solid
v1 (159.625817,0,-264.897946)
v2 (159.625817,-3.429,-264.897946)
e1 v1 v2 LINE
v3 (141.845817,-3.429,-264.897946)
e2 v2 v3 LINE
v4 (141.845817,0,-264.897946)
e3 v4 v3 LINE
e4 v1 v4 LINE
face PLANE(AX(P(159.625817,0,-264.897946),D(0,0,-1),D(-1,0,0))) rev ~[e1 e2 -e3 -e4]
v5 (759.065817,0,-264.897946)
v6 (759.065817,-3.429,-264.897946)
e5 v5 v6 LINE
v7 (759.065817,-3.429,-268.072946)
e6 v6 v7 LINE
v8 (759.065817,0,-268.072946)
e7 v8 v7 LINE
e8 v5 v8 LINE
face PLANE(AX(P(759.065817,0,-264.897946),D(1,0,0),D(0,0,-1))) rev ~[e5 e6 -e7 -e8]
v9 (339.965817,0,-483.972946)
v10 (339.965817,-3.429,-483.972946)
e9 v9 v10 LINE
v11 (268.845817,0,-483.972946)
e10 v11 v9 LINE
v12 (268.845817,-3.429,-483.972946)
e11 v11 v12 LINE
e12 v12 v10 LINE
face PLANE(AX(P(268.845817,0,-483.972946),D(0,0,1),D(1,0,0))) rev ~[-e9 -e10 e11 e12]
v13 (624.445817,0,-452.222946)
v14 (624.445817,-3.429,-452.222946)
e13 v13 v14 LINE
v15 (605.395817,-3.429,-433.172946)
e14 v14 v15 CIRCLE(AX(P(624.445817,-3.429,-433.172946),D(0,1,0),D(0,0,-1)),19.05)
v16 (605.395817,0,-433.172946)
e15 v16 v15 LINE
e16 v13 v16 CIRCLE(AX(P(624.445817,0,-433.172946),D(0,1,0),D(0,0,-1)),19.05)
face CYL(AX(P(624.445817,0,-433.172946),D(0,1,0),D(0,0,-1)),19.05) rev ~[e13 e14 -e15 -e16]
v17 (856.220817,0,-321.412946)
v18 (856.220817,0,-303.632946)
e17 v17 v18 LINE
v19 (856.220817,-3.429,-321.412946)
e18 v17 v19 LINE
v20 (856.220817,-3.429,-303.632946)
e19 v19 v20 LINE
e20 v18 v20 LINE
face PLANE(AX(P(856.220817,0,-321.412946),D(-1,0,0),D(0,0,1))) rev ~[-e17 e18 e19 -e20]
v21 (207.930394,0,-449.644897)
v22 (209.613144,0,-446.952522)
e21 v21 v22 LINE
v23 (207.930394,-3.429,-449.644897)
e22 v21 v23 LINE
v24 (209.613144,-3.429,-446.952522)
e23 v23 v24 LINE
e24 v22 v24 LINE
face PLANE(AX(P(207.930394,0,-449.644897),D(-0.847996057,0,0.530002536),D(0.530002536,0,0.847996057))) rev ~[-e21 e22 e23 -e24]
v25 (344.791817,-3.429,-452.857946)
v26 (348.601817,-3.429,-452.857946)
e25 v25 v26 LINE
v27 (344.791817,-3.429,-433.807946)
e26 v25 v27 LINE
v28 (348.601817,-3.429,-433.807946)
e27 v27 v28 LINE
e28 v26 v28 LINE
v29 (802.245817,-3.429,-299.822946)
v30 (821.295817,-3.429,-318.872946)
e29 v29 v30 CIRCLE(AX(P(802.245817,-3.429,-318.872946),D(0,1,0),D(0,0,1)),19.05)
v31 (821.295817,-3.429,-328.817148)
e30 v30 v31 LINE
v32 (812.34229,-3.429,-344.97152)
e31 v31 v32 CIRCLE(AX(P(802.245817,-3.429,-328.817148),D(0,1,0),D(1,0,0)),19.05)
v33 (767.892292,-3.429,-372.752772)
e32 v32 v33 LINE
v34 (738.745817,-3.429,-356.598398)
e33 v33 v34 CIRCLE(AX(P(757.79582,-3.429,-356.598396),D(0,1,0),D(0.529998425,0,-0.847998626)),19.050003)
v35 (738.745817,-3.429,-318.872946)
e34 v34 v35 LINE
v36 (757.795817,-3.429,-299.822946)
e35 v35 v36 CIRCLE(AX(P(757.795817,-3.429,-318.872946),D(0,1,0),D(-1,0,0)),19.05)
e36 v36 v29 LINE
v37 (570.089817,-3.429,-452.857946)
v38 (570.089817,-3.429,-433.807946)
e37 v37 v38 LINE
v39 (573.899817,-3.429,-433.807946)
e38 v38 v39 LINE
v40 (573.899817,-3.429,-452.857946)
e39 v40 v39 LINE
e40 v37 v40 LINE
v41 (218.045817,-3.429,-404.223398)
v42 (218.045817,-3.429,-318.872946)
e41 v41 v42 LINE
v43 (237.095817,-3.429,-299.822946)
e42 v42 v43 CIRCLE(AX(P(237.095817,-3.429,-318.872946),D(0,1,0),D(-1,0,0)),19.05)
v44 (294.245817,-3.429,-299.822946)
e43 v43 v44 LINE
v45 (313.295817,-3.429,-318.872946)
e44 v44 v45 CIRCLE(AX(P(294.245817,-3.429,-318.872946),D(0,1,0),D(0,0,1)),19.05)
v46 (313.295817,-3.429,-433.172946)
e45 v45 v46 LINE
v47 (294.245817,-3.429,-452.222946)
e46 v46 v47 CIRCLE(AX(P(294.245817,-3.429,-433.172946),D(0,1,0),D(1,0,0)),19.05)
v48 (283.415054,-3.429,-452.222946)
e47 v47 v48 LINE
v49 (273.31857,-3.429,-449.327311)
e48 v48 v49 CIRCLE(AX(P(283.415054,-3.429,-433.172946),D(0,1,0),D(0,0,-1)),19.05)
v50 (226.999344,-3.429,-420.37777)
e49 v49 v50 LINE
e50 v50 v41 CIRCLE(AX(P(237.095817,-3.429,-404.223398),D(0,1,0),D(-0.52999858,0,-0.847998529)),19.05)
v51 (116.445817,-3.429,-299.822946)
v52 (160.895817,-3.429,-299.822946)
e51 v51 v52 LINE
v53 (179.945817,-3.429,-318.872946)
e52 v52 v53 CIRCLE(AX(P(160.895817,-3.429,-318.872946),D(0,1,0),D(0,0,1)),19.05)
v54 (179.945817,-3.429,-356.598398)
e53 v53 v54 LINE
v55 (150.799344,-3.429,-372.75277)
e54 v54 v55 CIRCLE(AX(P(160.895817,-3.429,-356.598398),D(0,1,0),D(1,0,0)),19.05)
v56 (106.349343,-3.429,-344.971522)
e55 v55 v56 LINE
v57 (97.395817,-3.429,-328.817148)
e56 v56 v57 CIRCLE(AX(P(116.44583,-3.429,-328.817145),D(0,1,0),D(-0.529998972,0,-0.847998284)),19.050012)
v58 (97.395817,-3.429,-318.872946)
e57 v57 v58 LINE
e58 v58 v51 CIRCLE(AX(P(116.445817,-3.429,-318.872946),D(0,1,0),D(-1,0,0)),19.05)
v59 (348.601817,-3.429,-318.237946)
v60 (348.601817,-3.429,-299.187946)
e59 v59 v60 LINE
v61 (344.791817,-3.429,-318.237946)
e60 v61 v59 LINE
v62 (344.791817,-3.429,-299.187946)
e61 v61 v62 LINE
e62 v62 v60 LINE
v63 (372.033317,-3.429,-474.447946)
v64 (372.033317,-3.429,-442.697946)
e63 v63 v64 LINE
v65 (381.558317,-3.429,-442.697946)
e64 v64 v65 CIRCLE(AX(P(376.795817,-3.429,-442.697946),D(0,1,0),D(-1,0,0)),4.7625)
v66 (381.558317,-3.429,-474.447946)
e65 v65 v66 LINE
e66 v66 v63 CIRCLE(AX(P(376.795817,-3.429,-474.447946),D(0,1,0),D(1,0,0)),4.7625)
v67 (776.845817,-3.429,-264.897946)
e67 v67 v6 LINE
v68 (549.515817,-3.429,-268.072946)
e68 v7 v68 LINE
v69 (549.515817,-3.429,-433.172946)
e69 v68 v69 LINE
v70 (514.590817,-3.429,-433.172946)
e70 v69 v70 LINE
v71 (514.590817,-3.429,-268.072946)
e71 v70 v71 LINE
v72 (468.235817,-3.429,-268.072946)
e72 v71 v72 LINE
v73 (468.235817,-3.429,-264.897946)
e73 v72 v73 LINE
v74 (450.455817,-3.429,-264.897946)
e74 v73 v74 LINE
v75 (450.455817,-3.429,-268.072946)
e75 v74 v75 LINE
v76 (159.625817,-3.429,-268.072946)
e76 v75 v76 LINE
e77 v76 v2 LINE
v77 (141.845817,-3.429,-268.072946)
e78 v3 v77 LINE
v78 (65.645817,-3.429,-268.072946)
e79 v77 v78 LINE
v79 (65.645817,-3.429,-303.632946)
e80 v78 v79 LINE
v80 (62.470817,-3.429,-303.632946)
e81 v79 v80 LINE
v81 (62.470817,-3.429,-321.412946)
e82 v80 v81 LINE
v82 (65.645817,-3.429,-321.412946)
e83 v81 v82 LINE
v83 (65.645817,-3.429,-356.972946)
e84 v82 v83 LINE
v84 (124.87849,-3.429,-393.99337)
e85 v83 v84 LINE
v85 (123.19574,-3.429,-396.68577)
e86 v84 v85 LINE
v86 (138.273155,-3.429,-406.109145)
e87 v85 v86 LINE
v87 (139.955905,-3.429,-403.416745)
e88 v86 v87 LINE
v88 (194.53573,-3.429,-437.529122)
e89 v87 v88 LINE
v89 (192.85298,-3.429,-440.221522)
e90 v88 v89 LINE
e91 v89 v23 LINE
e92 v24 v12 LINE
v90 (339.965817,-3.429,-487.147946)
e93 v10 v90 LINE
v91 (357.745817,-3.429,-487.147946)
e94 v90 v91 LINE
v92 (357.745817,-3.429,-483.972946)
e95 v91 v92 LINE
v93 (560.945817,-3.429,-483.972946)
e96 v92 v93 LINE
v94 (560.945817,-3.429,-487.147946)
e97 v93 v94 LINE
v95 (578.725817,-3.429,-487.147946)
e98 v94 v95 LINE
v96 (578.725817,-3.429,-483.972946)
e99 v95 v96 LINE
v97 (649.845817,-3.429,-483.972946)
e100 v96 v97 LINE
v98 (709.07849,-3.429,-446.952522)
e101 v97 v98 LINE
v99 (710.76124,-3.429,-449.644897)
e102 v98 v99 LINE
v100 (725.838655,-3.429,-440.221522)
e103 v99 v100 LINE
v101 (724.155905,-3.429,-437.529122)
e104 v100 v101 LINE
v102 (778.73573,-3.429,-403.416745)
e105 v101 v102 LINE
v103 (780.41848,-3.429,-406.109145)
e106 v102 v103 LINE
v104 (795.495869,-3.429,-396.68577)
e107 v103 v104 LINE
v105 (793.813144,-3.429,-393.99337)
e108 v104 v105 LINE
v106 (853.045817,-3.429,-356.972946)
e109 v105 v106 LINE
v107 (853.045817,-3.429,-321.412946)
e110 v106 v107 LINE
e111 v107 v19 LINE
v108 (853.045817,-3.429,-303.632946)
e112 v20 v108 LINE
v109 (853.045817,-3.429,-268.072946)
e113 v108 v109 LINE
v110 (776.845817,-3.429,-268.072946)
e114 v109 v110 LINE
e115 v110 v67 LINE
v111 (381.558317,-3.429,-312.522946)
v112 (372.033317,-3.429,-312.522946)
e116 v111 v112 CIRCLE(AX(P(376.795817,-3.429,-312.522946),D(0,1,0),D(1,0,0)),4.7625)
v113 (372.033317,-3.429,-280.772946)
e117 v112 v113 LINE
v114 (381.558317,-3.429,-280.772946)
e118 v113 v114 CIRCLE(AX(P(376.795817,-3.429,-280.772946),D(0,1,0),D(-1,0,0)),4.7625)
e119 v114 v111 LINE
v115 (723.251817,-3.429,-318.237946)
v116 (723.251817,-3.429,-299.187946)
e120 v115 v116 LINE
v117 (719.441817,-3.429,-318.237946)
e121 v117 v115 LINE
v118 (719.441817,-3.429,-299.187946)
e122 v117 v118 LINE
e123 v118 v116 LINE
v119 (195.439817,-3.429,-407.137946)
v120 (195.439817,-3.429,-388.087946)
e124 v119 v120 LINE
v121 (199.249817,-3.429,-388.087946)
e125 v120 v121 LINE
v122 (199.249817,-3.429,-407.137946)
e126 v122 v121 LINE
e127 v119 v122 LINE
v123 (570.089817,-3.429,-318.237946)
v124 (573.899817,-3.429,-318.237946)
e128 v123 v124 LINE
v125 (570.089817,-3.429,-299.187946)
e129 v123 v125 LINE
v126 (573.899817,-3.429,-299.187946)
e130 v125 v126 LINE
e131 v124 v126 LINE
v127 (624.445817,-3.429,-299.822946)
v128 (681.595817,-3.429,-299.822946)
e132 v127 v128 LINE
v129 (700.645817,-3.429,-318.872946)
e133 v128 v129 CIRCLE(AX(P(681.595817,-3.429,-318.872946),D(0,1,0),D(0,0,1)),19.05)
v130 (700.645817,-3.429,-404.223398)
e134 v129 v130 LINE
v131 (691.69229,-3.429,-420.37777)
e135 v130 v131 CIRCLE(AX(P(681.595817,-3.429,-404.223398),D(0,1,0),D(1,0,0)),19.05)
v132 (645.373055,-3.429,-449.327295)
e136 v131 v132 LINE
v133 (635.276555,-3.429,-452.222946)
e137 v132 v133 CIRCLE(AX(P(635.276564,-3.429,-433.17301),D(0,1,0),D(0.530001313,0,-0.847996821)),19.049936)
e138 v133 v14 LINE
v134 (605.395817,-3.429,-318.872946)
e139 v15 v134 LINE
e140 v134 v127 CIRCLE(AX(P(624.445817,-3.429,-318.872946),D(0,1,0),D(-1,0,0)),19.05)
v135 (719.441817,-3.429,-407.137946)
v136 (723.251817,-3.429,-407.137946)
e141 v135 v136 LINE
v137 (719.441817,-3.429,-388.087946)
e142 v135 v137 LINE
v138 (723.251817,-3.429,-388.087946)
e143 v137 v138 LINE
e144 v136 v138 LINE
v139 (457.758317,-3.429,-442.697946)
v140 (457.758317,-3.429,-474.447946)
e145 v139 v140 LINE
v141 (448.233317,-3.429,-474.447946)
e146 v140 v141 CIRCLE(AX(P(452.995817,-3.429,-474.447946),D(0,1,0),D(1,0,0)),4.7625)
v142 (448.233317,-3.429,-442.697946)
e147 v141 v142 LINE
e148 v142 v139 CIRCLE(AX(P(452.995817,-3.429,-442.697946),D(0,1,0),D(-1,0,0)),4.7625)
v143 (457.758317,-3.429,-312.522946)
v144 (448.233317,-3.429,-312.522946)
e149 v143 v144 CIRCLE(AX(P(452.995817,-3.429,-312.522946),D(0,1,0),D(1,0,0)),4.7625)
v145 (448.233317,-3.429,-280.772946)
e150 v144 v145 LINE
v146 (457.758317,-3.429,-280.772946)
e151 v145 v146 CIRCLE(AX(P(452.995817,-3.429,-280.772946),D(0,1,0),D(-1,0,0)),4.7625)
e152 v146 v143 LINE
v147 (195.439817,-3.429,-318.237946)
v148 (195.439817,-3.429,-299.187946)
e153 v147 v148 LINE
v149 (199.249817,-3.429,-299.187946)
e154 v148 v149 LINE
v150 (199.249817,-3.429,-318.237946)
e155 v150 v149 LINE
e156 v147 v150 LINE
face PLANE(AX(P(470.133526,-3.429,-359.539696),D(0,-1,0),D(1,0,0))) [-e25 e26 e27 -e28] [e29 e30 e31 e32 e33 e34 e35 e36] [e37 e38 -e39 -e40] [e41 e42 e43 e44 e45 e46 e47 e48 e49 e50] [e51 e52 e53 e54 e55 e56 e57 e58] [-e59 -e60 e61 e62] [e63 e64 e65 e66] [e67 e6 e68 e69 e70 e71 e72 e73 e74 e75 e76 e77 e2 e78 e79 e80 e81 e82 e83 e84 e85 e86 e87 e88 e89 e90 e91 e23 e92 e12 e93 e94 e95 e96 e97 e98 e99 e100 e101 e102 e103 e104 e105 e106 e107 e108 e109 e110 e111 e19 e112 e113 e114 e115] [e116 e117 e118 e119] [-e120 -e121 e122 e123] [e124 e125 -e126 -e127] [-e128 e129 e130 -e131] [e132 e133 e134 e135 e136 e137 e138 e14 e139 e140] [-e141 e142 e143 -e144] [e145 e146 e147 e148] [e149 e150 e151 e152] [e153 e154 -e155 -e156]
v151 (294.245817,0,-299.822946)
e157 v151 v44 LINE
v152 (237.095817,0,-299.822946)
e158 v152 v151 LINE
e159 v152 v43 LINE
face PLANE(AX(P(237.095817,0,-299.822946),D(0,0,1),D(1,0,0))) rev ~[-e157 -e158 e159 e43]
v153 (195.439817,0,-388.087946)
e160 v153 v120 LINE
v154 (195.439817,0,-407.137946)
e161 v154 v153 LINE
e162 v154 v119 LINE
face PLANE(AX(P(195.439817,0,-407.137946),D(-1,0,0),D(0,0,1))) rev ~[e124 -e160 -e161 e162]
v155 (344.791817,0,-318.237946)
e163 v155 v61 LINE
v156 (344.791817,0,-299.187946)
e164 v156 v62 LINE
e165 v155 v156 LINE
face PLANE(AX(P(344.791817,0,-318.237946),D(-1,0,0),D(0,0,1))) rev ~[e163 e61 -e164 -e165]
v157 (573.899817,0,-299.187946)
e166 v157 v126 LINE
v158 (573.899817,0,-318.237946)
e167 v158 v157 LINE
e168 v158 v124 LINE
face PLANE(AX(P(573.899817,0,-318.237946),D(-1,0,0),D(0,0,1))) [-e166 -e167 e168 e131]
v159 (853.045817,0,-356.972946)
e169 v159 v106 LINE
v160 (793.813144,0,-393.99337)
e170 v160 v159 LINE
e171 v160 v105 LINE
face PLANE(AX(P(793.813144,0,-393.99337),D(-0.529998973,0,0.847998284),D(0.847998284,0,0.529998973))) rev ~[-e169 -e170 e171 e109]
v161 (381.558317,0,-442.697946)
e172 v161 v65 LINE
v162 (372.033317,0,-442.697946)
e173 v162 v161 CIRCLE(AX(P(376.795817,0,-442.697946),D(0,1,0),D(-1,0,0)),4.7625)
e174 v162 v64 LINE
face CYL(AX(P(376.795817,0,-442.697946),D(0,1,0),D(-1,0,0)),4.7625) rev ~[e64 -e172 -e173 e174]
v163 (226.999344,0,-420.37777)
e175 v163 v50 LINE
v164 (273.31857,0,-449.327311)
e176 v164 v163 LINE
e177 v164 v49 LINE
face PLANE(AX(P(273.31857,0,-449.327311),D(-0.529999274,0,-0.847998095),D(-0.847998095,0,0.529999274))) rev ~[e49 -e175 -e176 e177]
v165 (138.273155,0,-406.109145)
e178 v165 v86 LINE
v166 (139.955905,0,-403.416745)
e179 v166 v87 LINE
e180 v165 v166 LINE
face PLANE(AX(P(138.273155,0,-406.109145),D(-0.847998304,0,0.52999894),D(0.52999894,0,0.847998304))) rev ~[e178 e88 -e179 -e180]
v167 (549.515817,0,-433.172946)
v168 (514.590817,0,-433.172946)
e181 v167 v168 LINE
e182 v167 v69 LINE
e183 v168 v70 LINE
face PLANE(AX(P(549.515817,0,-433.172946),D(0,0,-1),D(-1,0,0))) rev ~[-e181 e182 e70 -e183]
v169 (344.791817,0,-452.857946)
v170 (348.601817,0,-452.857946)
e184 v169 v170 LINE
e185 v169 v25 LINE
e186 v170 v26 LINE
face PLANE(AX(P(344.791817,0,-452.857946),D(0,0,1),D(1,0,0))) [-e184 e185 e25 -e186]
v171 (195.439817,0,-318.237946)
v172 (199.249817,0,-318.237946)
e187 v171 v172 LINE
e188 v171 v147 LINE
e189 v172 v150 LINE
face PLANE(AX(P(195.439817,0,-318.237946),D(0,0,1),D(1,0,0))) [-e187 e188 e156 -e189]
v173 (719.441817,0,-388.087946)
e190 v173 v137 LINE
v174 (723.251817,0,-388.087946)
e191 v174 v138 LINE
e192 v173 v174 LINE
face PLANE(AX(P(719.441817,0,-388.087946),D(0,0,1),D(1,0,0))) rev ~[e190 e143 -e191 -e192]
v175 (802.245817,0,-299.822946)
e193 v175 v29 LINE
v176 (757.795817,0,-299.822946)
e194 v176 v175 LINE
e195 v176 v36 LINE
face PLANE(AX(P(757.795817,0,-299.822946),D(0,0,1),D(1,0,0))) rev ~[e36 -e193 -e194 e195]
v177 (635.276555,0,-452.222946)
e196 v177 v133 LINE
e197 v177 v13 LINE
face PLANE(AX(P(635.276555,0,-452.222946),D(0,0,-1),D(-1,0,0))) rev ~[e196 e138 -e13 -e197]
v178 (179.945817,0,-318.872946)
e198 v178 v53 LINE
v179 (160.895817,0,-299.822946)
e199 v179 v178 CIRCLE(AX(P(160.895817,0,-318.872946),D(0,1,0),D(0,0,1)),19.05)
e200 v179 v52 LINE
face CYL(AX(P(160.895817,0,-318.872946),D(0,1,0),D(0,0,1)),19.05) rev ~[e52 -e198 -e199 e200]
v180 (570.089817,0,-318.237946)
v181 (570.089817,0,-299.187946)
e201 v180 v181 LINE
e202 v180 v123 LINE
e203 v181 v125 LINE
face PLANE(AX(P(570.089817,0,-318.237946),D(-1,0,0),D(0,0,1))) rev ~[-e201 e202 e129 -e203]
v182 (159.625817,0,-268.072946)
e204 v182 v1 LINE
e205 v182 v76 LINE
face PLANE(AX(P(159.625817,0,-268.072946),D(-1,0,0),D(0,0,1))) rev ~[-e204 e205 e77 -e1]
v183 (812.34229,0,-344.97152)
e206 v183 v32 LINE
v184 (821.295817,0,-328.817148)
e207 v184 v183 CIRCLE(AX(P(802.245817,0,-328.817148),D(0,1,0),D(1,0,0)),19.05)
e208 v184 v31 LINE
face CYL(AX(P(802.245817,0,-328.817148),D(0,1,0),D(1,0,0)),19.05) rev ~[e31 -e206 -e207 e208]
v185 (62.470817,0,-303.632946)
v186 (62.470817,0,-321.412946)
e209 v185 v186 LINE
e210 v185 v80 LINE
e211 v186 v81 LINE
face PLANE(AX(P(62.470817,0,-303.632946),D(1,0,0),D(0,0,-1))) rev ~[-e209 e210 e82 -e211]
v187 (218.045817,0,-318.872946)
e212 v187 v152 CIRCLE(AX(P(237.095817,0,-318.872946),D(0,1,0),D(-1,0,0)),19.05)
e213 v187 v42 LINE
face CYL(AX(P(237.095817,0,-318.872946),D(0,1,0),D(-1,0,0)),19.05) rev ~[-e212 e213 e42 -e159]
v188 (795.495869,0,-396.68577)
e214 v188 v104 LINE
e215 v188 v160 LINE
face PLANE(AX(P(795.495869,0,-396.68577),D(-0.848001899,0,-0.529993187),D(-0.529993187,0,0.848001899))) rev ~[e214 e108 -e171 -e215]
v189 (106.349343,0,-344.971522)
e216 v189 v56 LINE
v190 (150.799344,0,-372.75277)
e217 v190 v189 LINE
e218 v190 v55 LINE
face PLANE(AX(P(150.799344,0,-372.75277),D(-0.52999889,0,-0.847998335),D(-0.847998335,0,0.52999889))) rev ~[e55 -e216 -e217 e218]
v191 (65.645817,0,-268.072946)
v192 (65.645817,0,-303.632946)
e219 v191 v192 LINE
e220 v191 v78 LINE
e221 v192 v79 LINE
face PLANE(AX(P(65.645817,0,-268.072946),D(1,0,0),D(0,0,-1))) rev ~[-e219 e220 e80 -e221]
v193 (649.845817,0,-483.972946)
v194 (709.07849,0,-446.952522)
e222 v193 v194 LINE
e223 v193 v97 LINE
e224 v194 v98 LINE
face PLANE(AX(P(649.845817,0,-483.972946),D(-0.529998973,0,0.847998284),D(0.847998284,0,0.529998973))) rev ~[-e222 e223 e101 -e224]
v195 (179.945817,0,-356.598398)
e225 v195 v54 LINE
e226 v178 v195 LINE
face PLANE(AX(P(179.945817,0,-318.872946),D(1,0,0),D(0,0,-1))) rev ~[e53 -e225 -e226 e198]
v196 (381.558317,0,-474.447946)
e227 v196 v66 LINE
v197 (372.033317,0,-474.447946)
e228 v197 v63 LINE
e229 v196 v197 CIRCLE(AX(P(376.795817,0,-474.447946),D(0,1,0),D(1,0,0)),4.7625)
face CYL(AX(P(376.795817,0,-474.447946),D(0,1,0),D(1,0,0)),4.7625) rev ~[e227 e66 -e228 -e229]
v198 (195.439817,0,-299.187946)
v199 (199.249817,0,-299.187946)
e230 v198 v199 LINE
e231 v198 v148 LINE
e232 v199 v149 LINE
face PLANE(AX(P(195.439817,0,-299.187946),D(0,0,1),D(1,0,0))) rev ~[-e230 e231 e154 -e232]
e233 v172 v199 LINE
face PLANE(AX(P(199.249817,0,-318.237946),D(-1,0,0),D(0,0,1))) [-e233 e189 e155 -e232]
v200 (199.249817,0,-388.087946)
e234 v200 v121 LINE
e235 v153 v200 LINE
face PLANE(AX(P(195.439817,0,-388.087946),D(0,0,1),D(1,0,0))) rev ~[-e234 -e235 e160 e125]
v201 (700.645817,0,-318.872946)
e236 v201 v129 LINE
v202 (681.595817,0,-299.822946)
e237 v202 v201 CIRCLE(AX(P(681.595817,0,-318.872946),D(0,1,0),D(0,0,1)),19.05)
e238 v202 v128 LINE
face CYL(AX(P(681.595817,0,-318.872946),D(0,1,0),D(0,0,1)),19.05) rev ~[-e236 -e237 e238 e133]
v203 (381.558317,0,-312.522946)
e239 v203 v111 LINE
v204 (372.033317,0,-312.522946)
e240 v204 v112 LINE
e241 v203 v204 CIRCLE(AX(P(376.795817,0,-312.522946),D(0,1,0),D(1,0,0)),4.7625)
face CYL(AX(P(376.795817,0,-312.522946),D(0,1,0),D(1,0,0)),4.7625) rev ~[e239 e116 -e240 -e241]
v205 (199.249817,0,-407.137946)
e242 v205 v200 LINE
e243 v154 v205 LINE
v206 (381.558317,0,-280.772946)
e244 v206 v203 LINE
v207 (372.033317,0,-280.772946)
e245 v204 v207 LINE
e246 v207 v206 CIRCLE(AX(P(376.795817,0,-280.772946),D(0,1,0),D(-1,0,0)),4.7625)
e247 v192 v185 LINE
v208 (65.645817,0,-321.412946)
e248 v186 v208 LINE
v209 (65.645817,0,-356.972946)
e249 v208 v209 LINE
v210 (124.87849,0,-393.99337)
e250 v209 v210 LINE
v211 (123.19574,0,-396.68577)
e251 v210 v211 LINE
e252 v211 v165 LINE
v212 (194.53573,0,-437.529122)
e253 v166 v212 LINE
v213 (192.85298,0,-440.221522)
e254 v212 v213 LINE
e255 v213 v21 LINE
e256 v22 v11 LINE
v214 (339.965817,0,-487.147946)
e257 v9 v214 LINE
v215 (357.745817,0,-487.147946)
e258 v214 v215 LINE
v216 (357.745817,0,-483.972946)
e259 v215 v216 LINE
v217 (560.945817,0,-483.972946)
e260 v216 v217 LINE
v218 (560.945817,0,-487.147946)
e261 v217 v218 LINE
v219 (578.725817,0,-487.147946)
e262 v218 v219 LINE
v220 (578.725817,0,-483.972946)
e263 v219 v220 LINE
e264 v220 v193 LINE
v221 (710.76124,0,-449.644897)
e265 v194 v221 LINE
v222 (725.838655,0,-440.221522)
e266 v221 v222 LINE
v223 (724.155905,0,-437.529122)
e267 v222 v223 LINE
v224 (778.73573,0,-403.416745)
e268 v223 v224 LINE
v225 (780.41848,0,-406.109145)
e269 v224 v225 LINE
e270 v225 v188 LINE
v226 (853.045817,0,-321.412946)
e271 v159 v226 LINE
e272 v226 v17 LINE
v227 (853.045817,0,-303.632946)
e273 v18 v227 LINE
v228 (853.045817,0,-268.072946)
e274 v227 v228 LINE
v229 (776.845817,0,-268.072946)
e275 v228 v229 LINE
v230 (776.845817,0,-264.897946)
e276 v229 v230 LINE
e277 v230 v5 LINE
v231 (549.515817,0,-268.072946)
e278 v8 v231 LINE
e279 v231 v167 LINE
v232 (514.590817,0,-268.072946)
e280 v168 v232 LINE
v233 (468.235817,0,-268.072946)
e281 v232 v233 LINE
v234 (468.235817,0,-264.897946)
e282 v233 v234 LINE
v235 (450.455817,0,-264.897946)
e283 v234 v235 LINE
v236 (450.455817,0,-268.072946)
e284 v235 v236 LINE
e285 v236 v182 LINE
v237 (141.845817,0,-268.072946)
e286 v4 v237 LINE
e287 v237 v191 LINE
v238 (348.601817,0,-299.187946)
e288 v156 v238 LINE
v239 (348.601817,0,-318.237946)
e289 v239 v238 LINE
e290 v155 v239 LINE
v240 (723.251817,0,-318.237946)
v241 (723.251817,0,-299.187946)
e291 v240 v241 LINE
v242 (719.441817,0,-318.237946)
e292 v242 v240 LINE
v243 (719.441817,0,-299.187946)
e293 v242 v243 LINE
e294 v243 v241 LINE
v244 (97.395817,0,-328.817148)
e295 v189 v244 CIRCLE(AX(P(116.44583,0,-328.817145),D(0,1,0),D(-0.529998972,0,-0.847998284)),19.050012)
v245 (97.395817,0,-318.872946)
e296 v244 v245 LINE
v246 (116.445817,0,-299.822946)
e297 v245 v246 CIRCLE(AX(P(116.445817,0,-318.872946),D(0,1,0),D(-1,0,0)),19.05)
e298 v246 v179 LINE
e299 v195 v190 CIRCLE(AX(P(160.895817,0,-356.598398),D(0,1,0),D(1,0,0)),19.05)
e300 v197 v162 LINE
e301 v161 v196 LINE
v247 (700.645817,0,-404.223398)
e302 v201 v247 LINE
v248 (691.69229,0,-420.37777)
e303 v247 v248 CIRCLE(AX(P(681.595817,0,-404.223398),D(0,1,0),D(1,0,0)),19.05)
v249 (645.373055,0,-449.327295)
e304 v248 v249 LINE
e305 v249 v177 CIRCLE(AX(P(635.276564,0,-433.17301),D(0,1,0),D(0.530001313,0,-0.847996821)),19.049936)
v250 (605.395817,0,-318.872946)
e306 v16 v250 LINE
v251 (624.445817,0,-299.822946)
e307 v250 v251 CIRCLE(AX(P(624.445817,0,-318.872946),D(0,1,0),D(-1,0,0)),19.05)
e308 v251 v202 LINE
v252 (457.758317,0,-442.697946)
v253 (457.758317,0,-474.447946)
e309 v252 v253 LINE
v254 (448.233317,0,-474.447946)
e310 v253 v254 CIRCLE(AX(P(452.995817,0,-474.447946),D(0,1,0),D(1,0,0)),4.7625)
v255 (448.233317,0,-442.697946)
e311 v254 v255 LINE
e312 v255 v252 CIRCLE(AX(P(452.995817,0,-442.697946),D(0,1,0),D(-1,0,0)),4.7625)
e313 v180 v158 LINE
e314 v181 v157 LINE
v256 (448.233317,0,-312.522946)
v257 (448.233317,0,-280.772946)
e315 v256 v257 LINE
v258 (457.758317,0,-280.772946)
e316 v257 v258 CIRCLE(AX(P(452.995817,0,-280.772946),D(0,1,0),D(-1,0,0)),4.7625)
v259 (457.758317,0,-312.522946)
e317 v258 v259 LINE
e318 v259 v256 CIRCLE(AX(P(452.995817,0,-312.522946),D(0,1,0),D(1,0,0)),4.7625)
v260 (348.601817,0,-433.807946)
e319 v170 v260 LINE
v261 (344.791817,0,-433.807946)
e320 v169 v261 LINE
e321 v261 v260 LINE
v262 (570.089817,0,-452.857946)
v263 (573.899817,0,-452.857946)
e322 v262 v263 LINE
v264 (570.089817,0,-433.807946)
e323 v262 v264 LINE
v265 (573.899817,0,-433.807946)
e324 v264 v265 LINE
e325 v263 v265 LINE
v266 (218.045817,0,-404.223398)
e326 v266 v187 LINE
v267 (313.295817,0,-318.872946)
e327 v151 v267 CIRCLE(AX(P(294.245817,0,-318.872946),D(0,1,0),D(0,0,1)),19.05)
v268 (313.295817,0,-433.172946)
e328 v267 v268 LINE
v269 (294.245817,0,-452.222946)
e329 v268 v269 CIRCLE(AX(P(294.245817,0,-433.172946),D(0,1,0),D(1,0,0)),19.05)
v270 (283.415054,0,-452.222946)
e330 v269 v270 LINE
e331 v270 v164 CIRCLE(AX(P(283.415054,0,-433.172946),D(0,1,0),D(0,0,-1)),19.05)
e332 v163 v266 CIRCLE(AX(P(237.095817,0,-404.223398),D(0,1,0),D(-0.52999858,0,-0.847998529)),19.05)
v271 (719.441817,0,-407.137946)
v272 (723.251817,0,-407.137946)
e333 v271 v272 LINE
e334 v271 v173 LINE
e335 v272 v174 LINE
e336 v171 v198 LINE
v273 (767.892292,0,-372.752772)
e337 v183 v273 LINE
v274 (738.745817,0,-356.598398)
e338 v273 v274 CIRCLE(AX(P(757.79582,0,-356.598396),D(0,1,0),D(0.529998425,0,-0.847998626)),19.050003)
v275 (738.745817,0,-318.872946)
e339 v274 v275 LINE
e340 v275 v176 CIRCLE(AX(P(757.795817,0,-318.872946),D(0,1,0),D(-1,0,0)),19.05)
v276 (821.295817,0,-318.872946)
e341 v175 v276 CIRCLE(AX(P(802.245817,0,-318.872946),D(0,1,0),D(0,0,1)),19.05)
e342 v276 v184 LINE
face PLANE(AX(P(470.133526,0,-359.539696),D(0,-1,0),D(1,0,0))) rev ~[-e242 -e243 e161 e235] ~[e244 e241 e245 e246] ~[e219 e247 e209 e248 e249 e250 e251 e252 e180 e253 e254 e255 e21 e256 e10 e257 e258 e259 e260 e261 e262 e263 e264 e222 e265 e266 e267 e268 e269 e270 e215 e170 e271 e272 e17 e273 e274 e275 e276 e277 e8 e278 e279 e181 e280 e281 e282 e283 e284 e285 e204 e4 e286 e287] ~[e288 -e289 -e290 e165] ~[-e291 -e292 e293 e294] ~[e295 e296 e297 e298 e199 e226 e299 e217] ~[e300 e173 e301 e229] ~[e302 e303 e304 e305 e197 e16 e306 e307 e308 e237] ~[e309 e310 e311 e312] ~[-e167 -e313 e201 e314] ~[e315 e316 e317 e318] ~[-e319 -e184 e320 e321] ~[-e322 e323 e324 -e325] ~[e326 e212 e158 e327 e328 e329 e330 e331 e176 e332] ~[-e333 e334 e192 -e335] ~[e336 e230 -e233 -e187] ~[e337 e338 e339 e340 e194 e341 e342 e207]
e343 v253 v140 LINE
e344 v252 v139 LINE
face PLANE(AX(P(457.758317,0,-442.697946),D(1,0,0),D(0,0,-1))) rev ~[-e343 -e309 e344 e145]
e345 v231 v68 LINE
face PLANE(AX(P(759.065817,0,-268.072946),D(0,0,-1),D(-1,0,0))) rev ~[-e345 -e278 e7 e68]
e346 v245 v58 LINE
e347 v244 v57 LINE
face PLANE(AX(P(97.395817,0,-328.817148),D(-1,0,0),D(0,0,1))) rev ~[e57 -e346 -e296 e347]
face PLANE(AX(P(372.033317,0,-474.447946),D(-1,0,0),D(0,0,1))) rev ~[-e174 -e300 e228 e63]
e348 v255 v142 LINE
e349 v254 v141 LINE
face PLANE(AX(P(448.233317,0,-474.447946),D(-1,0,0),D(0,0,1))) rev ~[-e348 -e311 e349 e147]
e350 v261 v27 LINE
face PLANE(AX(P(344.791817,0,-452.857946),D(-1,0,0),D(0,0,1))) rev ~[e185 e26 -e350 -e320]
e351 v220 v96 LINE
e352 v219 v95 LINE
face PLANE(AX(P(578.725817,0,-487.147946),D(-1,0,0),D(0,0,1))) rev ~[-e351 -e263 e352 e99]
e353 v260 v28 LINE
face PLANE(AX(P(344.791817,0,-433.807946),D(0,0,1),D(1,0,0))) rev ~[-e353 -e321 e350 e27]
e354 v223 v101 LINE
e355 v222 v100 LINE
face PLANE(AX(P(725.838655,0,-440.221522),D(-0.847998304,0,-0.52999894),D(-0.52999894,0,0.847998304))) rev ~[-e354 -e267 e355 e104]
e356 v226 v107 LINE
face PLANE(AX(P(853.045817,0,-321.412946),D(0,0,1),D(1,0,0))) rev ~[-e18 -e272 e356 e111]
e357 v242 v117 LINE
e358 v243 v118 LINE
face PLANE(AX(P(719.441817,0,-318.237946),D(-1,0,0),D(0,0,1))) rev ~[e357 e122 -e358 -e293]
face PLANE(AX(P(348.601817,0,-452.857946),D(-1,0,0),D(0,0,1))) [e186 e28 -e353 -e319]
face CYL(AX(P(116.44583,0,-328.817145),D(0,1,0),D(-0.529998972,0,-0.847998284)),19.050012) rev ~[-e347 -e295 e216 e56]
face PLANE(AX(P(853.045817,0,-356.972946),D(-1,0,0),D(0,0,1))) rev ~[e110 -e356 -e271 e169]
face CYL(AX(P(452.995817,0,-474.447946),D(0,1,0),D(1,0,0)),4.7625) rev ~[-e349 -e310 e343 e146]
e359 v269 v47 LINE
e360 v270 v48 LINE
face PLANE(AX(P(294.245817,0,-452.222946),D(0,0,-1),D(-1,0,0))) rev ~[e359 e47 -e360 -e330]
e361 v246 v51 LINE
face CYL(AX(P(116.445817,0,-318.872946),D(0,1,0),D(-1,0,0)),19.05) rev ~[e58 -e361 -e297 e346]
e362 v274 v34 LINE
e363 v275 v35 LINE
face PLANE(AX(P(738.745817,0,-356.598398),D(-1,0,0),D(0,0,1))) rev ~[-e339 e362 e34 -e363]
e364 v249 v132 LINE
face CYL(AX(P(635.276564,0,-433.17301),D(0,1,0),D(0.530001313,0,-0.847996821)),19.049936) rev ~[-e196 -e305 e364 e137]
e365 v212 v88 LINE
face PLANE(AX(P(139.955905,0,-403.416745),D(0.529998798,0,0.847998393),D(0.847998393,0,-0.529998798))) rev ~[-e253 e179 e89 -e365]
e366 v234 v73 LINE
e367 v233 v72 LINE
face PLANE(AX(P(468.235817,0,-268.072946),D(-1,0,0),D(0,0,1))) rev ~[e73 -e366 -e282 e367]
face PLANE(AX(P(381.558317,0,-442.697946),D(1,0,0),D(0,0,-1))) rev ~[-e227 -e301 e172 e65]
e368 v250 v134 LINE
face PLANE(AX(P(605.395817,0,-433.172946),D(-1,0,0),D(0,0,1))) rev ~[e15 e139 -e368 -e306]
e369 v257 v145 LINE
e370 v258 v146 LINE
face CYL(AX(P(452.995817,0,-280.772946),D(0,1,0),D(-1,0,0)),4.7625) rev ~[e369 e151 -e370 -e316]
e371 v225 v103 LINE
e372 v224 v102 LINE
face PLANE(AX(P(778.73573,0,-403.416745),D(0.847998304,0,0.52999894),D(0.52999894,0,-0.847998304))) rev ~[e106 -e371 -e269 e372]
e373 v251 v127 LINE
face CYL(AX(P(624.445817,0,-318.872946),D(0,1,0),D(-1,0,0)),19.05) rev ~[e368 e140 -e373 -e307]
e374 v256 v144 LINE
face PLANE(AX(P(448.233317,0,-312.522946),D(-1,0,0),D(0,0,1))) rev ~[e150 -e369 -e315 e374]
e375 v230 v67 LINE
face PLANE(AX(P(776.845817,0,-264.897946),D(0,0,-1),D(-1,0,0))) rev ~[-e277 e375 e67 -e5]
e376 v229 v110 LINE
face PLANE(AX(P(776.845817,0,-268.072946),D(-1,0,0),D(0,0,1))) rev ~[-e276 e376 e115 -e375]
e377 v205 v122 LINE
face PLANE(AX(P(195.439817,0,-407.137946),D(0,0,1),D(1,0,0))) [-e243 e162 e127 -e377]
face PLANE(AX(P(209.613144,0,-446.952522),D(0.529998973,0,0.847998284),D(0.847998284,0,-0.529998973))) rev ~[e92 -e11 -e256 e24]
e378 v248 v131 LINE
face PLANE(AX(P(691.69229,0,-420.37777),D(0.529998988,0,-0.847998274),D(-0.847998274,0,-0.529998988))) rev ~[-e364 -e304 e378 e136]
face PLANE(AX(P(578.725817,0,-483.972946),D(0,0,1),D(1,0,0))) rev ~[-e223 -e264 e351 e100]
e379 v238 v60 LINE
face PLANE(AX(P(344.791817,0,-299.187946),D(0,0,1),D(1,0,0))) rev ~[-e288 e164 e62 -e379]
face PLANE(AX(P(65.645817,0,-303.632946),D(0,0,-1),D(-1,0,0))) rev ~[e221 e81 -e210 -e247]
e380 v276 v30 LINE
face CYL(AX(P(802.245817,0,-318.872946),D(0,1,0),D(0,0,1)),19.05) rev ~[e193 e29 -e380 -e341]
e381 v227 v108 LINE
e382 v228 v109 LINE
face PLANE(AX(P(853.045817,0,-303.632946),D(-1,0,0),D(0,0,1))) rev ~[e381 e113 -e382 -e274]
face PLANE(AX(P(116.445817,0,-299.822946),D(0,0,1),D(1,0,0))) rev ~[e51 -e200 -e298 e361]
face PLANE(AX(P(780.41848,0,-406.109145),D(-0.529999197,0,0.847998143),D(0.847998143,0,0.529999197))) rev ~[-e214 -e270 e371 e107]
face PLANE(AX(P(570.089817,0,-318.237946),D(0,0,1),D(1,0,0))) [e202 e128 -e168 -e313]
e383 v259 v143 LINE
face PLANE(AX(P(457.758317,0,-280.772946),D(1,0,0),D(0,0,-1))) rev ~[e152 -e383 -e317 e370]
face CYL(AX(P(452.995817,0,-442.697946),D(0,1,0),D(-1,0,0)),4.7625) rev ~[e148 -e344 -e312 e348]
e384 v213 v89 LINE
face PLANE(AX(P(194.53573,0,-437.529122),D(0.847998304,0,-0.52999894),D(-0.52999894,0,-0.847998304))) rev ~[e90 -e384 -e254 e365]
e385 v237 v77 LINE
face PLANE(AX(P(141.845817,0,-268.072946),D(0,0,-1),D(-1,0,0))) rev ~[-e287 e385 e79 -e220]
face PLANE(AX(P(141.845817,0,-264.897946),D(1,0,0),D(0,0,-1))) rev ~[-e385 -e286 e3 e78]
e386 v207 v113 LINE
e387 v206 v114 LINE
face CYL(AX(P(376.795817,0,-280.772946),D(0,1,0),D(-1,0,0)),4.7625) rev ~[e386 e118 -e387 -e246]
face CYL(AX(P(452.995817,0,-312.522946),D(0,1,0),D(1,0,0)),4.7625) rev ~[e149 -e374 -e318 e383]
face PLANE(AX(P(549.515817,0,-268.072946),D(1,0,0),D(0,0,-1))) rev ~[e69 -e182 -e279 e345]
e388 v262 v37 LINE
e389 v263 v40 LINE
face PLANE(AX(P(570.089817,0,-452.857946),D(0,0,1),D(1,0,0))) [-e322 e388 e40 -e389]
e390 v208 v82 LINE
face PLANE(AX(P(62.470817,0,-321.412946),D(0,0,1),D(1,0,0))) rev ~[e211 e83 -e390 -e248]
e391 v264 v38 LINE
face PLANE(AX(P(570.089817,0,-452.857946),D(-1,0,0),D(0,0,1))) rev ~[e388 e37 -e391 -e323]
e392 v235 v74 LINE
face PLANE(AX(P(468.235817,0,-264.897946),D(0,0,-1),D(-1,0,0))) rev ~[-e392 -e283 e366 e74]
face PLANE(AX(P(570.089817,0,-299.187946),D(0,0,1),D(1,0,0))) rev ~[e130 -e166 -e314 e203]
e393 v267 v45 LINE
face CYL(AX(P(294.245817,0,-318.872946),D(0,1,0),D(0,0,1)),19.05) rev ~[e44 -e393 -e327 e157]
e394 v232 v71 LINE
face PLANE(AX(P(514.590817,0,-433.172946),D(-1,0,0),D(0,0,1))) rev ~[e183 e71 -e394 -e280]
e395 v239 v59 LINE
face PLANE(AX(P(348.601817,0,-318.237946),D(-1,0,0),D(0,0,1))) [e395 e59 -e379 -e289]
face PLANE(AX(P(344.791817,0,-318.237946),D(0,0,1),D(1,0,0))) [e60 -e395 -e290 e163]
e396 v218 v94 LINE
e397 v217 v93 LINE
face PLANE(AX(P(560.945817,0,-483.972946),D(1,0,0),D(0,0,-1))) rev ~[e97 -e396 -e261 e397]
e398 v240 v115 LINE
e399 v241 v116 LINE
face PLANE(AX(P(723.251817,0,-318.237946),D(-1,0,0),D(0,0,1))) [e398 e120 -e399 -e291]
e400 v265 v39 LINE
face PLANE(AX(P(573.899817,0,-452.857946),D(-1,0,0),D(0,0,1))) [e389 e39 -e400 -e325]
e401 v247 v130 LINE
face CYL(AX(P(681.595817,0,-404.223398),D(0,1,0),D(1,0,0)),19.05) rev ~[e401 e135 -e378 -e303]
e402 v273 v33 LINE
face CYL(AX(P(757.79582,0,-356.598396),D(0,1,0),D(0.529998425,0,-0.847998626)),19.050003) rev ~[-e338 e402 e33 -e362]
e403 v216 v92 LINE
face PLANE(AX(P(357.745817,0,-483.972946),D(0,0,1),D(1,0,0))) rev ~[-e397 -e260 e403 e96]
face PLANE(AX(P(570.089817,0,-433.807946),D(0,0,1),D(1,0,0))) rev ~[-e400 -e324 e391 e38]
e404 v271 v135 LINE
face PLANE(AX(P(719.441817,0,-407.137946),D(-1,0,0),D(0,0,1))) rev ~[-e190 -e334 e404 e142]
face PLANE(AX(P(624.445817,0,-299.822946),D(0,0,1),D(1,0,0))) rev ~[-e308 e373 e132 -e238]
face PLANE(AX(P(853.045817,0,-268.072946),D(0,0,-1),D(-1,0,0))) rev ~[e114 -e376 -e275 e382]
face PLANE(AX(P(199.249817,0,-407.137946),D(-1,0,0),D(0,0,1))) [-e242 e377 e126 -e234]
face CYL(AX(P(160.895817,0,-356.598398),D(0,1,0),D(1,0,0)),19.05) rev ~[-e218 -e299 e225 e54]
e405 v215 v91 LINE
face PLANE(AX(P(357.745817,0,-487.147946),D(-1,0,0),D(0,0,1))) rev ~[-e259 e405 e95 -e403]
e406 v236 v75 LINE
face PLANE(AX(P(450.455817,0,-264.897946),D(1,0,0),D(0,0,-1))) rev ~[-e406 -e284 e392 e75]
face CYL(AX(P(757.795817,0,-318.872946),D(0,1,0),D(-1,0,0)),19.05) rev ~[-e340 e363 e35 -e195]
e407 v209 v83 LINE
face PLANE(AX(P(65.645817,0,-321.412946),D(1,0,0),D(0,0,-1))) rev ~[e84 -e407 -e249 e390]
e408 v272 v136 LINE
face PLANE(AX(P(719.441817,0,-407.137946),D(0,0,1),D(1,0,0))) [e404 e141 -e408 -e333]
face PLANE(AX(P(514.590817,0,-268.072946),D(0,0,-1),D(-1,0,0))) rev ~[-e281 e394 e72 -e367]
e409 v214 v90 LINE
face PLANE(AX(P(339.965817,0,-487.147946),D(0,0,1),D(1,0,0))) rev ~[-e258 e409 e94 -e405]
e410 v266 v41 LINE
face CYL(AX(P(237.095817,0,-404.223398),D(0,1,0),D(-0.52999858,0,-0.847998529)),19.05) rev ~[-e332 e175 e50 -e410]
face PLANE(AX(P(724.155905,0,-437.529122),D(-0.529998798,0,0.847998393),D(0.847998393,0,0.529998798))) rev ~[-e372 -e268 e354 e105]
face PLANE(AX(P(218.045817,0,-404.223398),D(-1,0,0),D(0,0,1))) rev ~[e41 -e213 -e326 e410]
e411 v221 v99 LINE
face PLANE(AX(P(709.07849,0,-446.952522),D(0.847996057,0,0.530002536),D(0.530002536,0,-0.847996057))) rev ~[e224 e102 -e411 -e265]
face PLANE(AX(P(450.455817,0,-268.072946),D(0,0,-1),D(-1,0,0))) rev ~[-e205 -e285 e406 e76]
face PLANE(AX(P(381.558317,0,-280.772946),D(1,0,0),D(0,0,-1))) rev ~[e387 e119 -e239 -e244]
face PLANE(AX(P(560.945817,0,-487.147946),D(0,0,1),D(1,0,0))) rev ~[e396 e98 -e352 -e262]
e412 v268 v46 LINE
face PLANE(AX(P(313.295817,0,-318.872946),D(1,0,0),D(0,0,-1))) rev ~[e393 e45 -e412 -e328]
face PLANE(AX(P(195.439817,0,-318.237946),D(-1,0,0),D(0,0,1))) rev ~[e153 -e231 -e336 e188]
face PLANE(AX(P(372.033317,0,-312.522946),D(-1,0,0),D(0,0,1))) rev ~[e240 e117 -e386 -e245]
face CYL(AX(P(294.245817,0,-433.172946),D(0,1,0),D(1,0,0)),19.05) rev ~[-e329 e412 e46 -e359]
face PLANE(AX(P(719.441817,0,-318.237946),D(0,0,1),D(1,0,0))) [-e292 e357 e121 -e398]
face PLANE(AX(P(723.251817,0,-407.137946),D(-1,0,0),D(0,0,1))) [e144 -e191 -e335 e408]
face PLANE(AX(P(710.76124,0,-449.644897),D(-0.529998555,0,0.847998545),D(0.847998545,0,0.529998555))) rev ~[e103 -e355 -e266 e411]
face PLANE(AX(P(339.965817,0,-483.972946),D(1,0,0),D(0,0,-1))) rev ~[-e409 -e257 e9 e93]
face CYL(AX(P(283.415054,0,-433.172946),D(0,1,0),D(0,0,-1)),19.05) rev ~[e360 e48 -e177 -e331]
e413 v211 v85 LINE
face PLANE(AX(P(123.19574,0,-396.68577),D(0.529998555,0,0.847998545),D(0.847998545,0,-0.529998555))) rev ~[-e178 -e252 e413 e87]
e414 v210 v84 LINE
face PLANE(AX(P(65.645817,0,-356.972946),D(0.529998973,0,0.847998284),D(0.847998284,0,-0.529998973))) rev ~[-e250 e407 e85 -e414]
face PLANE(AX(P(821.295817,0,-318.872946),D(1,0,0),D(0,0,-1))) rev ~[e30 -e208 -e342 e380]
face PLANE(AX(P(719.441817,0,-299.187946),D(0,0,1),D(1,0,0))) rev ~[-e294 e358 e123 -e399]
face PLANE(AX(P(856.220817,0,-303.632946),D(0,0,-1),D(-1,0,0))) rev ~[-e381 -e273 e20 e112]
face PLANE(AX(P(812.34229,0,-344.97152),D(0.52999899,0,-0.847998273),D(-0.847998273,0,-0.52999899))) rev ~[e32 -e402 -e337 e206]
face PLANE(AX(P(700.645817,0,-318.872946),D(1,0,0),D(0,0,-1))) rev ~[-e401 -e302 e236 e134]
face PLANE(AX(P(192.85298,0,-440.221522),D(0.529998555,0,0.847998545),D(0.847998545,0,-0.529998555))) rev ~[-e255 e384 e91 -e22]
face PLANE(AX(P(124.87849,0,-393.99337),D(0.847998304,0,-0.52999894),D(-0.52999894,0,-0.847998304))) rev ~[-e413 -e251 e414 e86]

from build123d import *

# Parameters (mm, degrees)
F0_W     = 3.81
F0_H     = 19.05
F1_DEPTH = 3.429


# Not quite as in the source:
# - ends of sketch curves that miss each other by under 0.0002 mm in the source are joined


with BuildPart() as f1:
    # F0 (on Front) → F1 (new body)
    with BuildSketch(Plane.XZ):
        Polygon((65.6458174, -303.6329462), (62.4708174, -303.6329462), (62.4708174, -321.4129462), (65.6458174, -321.4129462), (65.6458174, -356.9729462), (124.8784904, -393.99337), (123.1957404, -396.68577), (138.273155, -406.1091446), (139.955905, -403.4167446), (194.5357298, -437.5291224), (192.8529798, -440.2215224), (207.9303944, -449.644897), (209.6131444, -446.9525224), (268.8458174, -483.9729462), (339.9658174, -483.9729462), (339.9658174, -487.1479462), (357.7458174, -487.1479462), (357.7458174, -483.9729462), (560.9458174, -483.9729462), (560.9458174, -487.1479462), (578.7258174, -487.1479462), (578.7258174, -483.9729462), (649.8458174, -483.9729462), (709.0784904, -446.9525224), (710.7612404, -449.644897), (725.838655, -440.2215224), (724.155905, -437.5291224), (778.7357298, -403.4167446), (780.4184798, -406.1091446), (795.495869, -396.68577), (793.8131444, -393.99337), (853.0458174, -356.9729462), (853.0458174, -321.4129462), (856.2208174, -321.4129462), (856.2208174, -303.6329462), (853.0458174, -303.6329462), (853.0458174, -268.0729462), (776.8458174, -268.0729462), (776.8458174, -264.8979462), (759.0658174, -264.8979462), (759.0658174, -268.0729462), (549.5158174, -268.0729462), (549.5158174, -433.1729462), (514.5908174, -433.1729462), (514.5908174, -268.0729462), (468.2358174, -268.0729462), (468.2358174, -264.8979462), (450.4558174, -264.8979462), (450.4558174, -268.0729462), (159.6258174, -268.0729462), (159.6258174, -264.8979462), (141.8458174, -264.8979462), (141.8458174, -268.0729462), (65.6458174, -268.0729462), align=None)
        with Locations((346.6968174, -443.3329462)):
            Rectangle(F0_W, F0_H, mode=Mode.SUBTRACT)
        with BuildLine():
            ThreePointArc((372.0333174, -442.6979462), (376.7958174, -437.9354462), (381.5583174, -442.6979462))
            Line((381.5583174, -442.6979462), (381.5583174, -474.4479462))
            ThreePointArc((381.5583174, -474.4479462), (376.7958174, -479.2104462), (372.0333174, -474.4479462))
            Line((372.0333174, -474.4479462), (372.0333174, -442.6979462))
        make_face(mode=Mode.SUBTRACT)
        with BuildLine():
            ThreePointArc((457.7583174, -474.4479462), (452.9958174, -479.2104462), (448.2333174, -474.4479462))
            Line((448.2333174, -474.4479462), (448.2333174, -442.6979462))
            ThreePointArc((448.2333174, -442.6979462), (452.9958174, -437.9354462), (457.7583174, -442.6979462))
            Line((457.7583174, -442.6979462), (457.7583174, -474.4479462))
        make_face(mode=Mode.SUBTRACT)
        with Locations((197.3448174, -397.6129462)):
            Rectangle(F0_W, F0_H, mode=Mode.SUBTRACT)
        with Locations((571.9948174, -443.3329462)):
            Rectangle(F0_W, F0_H, mode=Mode.SUBTRACT)
        with Locations((721.3468174, -397.6129462)):
            Rectangle(F0_W, F0_H, mode=Mode.SUBTRACT)
        with BuildLine():
            ThreePointArc((179.9458174, -356.5983978), (170.1306614744, -373.26033511), (150.7993444424, -372.7527697722))
            Line((150.7993444424, -372.7527697722), (106.3493428, -344.9715224))
            ThreePointArc((106.3493428, -344.9715224), (99.78388009, -338.0519918744), (97.3958174, -328.8171478))
            Line((97.3958174, -328.8171478), (97.3958174, -318.8729462))
            ThreePointArc((97.3958174, -318.8729462), (102.9754332184, -305.4025620184), (116.4458174, -299.8229462))
            Line((116.4458174, -299.8229462), (160.8958174, -299.8229462))
            ThreePointArc((160.8958174, -299.8229462), (174.3662015816, -305.4025620184), (179.9458174, -318.8729462))
            Line((179.9458174, -318.8729462), (179.9458174, -356.5983978))
        make_face(mode=Mode.SUBTRACT)
        with BuildLine():
            ThreePointArc((226.9993444424, -420.3777697722), (220.43388009, -413.4582418744), (218.0458174, -404.2233978))
            Line((218.0458174, -404.2233978), (218.0458174, -318.8729462))
            ThreePointArc((218.0458174, -318.8729462), (223.6254332184, -305.4025620184), (237.0958174, -299.8229462))
            Line((237.0958174, -299.8229462), (294.2458174, -299.8229462))
            ThreePointArc((294.2458174, -299.8229462), (307.7162015816, -305.4025620184), (313.2958174, -318.8729462))
            Line((313.2958174, -318.8729462), (313.2958174, -433.1729462))
            ThreePointArc((313.2958174, -433.1729462), (307.7162015816, -446.6433303816), (294.2458174, -452.2229462))
            Line((294.2458174, -452.2229462), (283.4150542, -452.2229462))
            ThreePointArc((283.4150542, -452.2229462), (278.1632997385, -451.4847340722), (273.3185698266, -449.3273110374))
            Line((273.3185698266, -449.3273110374), (226.9993444424, -420.3777697722))
        make_face(mode=Mode.SUBTRACT)
        with Locations((197.3448174, -308.7129462)):
            Rectangle(F0_W, F0_H, mode=Mode.SUBTRACT)
        with Locations((346.6968174, -308.7129462)):
            Rectangle(F0_W, F0_H, mode=Mode.SUBTRACT)
        with BuildLine():
            ThreePointArc((372.0333174, -280.7729462), (376.7958174, -276.0104462), (381.5583174, -280.7729462))
            Line((381.5583174, -280.7729462), (381.5583174, -312.5229462))
            ThreePointArc((381.5583174, -312.5229462), (376.7958174, -317.2854462), (372.0333174, -312.5229462))
            Line((372.0333174, -312.5229462), (372.0333174, -280.7729462))
        make_face(mode=Mode.SUBTRACT)
        with BuildLine():
            ThreePointArc((457.7583174, -312.5229462), (452.9958174, -317.2854462), (448.2333174, -312.5229462))
            Line((448.2333174, -312.5229462), (448.2333174, -280.7729462))
            ThreePointArc((448.2333174, -280.7729462), (452.9958174, -276.0104462), (457.7583174, -280.7729462))
            Line((457.7583174, -280.7729462), (457.7583174, -312.5229462))
        make_face(mode=Mode.SUBTRACT)
        with BuildLine():
            ThreePointArc((624.4458174, -452.2229462), (610.9754332184, -446.6433303816), (605.3958174, -433.1729462))
            Line((605.3958174, -433.1729462), (605.3958174, -318.8729462))
            ThreePointArc((605.3958174, -318.8729462), (610.9754332184, -305.4025620184), (624.4458174, -299.8229462))
            Line((624.4458174, -299.8229462), (681.5958174, -299.8229462))
            ThreePointArc((681.5958174, -299.8229462), (695.0662015816, -305.4025620184), (700.6458174, -318.8729462))
            Line((700.6458174, -318.8729462), (700.6458174, -404.2233978))
            ThreePointArc((700.6458174, -404.2233978), (698.25775471, -413.4582418744), (691.6922903576, -420.3777697722))
            Line((691.6922903576, -420.3777697722), (645.3730552, -449.3272954))
            ThreePointArc((645.3730552, -449.3272954), (640.5283200138, -451.4847311032), (635.2765552, -452.2229462))
            Line((635.2765552, -452.2229462), (624.4458174, -452.2229462))
        make_face(mode=Mode.SUBTRACT)
        with BuildLine():
            ThreePointArc((738.7458174, -318.8729462), (744.3254332184, -305.4025620184), (757.7958174, -299.8229462))
            Line((757.7958174, -299.8229462), (802.2458174, -299.8229462))
            ThreePointArc((802.2458174, -299.8229462), (815.7162015816, -305.4025620184), (821.2958174, -318.8729462))
            Line((821.2958174, -318.8729462), (821.2958174, -328.8171478))
            ThreePointArc((821.2958174, -328.8171478), (818.90775471, -338.0519918744), (812.3422903576, -344.9715197722))
            Line((812.3422903576, -344.9715197722), (767.892292, -372.7527724))
            ThreePointArc((767.892292, -372.7527724), (748.5609733256, -373.26033511), (738.7458174, -356.5983978))
            Line((738.7458174, -356.5983978), (738.7458174, -318.8729462))
        make_face(mode=Mode.SUBTRACT)
        with Locations((571.9948174, -308.7129462)):
            Rectangle(F0_W, F0_H, mode=Mode.SUBTRACT)
        with Locations((721.3468174, -308.7129462)):
            Rectangle(F0_W, F0_H, mode=Mode.SUBTRACT)
    extrude(amount=F1_DEPTH)


solid = f1.part
